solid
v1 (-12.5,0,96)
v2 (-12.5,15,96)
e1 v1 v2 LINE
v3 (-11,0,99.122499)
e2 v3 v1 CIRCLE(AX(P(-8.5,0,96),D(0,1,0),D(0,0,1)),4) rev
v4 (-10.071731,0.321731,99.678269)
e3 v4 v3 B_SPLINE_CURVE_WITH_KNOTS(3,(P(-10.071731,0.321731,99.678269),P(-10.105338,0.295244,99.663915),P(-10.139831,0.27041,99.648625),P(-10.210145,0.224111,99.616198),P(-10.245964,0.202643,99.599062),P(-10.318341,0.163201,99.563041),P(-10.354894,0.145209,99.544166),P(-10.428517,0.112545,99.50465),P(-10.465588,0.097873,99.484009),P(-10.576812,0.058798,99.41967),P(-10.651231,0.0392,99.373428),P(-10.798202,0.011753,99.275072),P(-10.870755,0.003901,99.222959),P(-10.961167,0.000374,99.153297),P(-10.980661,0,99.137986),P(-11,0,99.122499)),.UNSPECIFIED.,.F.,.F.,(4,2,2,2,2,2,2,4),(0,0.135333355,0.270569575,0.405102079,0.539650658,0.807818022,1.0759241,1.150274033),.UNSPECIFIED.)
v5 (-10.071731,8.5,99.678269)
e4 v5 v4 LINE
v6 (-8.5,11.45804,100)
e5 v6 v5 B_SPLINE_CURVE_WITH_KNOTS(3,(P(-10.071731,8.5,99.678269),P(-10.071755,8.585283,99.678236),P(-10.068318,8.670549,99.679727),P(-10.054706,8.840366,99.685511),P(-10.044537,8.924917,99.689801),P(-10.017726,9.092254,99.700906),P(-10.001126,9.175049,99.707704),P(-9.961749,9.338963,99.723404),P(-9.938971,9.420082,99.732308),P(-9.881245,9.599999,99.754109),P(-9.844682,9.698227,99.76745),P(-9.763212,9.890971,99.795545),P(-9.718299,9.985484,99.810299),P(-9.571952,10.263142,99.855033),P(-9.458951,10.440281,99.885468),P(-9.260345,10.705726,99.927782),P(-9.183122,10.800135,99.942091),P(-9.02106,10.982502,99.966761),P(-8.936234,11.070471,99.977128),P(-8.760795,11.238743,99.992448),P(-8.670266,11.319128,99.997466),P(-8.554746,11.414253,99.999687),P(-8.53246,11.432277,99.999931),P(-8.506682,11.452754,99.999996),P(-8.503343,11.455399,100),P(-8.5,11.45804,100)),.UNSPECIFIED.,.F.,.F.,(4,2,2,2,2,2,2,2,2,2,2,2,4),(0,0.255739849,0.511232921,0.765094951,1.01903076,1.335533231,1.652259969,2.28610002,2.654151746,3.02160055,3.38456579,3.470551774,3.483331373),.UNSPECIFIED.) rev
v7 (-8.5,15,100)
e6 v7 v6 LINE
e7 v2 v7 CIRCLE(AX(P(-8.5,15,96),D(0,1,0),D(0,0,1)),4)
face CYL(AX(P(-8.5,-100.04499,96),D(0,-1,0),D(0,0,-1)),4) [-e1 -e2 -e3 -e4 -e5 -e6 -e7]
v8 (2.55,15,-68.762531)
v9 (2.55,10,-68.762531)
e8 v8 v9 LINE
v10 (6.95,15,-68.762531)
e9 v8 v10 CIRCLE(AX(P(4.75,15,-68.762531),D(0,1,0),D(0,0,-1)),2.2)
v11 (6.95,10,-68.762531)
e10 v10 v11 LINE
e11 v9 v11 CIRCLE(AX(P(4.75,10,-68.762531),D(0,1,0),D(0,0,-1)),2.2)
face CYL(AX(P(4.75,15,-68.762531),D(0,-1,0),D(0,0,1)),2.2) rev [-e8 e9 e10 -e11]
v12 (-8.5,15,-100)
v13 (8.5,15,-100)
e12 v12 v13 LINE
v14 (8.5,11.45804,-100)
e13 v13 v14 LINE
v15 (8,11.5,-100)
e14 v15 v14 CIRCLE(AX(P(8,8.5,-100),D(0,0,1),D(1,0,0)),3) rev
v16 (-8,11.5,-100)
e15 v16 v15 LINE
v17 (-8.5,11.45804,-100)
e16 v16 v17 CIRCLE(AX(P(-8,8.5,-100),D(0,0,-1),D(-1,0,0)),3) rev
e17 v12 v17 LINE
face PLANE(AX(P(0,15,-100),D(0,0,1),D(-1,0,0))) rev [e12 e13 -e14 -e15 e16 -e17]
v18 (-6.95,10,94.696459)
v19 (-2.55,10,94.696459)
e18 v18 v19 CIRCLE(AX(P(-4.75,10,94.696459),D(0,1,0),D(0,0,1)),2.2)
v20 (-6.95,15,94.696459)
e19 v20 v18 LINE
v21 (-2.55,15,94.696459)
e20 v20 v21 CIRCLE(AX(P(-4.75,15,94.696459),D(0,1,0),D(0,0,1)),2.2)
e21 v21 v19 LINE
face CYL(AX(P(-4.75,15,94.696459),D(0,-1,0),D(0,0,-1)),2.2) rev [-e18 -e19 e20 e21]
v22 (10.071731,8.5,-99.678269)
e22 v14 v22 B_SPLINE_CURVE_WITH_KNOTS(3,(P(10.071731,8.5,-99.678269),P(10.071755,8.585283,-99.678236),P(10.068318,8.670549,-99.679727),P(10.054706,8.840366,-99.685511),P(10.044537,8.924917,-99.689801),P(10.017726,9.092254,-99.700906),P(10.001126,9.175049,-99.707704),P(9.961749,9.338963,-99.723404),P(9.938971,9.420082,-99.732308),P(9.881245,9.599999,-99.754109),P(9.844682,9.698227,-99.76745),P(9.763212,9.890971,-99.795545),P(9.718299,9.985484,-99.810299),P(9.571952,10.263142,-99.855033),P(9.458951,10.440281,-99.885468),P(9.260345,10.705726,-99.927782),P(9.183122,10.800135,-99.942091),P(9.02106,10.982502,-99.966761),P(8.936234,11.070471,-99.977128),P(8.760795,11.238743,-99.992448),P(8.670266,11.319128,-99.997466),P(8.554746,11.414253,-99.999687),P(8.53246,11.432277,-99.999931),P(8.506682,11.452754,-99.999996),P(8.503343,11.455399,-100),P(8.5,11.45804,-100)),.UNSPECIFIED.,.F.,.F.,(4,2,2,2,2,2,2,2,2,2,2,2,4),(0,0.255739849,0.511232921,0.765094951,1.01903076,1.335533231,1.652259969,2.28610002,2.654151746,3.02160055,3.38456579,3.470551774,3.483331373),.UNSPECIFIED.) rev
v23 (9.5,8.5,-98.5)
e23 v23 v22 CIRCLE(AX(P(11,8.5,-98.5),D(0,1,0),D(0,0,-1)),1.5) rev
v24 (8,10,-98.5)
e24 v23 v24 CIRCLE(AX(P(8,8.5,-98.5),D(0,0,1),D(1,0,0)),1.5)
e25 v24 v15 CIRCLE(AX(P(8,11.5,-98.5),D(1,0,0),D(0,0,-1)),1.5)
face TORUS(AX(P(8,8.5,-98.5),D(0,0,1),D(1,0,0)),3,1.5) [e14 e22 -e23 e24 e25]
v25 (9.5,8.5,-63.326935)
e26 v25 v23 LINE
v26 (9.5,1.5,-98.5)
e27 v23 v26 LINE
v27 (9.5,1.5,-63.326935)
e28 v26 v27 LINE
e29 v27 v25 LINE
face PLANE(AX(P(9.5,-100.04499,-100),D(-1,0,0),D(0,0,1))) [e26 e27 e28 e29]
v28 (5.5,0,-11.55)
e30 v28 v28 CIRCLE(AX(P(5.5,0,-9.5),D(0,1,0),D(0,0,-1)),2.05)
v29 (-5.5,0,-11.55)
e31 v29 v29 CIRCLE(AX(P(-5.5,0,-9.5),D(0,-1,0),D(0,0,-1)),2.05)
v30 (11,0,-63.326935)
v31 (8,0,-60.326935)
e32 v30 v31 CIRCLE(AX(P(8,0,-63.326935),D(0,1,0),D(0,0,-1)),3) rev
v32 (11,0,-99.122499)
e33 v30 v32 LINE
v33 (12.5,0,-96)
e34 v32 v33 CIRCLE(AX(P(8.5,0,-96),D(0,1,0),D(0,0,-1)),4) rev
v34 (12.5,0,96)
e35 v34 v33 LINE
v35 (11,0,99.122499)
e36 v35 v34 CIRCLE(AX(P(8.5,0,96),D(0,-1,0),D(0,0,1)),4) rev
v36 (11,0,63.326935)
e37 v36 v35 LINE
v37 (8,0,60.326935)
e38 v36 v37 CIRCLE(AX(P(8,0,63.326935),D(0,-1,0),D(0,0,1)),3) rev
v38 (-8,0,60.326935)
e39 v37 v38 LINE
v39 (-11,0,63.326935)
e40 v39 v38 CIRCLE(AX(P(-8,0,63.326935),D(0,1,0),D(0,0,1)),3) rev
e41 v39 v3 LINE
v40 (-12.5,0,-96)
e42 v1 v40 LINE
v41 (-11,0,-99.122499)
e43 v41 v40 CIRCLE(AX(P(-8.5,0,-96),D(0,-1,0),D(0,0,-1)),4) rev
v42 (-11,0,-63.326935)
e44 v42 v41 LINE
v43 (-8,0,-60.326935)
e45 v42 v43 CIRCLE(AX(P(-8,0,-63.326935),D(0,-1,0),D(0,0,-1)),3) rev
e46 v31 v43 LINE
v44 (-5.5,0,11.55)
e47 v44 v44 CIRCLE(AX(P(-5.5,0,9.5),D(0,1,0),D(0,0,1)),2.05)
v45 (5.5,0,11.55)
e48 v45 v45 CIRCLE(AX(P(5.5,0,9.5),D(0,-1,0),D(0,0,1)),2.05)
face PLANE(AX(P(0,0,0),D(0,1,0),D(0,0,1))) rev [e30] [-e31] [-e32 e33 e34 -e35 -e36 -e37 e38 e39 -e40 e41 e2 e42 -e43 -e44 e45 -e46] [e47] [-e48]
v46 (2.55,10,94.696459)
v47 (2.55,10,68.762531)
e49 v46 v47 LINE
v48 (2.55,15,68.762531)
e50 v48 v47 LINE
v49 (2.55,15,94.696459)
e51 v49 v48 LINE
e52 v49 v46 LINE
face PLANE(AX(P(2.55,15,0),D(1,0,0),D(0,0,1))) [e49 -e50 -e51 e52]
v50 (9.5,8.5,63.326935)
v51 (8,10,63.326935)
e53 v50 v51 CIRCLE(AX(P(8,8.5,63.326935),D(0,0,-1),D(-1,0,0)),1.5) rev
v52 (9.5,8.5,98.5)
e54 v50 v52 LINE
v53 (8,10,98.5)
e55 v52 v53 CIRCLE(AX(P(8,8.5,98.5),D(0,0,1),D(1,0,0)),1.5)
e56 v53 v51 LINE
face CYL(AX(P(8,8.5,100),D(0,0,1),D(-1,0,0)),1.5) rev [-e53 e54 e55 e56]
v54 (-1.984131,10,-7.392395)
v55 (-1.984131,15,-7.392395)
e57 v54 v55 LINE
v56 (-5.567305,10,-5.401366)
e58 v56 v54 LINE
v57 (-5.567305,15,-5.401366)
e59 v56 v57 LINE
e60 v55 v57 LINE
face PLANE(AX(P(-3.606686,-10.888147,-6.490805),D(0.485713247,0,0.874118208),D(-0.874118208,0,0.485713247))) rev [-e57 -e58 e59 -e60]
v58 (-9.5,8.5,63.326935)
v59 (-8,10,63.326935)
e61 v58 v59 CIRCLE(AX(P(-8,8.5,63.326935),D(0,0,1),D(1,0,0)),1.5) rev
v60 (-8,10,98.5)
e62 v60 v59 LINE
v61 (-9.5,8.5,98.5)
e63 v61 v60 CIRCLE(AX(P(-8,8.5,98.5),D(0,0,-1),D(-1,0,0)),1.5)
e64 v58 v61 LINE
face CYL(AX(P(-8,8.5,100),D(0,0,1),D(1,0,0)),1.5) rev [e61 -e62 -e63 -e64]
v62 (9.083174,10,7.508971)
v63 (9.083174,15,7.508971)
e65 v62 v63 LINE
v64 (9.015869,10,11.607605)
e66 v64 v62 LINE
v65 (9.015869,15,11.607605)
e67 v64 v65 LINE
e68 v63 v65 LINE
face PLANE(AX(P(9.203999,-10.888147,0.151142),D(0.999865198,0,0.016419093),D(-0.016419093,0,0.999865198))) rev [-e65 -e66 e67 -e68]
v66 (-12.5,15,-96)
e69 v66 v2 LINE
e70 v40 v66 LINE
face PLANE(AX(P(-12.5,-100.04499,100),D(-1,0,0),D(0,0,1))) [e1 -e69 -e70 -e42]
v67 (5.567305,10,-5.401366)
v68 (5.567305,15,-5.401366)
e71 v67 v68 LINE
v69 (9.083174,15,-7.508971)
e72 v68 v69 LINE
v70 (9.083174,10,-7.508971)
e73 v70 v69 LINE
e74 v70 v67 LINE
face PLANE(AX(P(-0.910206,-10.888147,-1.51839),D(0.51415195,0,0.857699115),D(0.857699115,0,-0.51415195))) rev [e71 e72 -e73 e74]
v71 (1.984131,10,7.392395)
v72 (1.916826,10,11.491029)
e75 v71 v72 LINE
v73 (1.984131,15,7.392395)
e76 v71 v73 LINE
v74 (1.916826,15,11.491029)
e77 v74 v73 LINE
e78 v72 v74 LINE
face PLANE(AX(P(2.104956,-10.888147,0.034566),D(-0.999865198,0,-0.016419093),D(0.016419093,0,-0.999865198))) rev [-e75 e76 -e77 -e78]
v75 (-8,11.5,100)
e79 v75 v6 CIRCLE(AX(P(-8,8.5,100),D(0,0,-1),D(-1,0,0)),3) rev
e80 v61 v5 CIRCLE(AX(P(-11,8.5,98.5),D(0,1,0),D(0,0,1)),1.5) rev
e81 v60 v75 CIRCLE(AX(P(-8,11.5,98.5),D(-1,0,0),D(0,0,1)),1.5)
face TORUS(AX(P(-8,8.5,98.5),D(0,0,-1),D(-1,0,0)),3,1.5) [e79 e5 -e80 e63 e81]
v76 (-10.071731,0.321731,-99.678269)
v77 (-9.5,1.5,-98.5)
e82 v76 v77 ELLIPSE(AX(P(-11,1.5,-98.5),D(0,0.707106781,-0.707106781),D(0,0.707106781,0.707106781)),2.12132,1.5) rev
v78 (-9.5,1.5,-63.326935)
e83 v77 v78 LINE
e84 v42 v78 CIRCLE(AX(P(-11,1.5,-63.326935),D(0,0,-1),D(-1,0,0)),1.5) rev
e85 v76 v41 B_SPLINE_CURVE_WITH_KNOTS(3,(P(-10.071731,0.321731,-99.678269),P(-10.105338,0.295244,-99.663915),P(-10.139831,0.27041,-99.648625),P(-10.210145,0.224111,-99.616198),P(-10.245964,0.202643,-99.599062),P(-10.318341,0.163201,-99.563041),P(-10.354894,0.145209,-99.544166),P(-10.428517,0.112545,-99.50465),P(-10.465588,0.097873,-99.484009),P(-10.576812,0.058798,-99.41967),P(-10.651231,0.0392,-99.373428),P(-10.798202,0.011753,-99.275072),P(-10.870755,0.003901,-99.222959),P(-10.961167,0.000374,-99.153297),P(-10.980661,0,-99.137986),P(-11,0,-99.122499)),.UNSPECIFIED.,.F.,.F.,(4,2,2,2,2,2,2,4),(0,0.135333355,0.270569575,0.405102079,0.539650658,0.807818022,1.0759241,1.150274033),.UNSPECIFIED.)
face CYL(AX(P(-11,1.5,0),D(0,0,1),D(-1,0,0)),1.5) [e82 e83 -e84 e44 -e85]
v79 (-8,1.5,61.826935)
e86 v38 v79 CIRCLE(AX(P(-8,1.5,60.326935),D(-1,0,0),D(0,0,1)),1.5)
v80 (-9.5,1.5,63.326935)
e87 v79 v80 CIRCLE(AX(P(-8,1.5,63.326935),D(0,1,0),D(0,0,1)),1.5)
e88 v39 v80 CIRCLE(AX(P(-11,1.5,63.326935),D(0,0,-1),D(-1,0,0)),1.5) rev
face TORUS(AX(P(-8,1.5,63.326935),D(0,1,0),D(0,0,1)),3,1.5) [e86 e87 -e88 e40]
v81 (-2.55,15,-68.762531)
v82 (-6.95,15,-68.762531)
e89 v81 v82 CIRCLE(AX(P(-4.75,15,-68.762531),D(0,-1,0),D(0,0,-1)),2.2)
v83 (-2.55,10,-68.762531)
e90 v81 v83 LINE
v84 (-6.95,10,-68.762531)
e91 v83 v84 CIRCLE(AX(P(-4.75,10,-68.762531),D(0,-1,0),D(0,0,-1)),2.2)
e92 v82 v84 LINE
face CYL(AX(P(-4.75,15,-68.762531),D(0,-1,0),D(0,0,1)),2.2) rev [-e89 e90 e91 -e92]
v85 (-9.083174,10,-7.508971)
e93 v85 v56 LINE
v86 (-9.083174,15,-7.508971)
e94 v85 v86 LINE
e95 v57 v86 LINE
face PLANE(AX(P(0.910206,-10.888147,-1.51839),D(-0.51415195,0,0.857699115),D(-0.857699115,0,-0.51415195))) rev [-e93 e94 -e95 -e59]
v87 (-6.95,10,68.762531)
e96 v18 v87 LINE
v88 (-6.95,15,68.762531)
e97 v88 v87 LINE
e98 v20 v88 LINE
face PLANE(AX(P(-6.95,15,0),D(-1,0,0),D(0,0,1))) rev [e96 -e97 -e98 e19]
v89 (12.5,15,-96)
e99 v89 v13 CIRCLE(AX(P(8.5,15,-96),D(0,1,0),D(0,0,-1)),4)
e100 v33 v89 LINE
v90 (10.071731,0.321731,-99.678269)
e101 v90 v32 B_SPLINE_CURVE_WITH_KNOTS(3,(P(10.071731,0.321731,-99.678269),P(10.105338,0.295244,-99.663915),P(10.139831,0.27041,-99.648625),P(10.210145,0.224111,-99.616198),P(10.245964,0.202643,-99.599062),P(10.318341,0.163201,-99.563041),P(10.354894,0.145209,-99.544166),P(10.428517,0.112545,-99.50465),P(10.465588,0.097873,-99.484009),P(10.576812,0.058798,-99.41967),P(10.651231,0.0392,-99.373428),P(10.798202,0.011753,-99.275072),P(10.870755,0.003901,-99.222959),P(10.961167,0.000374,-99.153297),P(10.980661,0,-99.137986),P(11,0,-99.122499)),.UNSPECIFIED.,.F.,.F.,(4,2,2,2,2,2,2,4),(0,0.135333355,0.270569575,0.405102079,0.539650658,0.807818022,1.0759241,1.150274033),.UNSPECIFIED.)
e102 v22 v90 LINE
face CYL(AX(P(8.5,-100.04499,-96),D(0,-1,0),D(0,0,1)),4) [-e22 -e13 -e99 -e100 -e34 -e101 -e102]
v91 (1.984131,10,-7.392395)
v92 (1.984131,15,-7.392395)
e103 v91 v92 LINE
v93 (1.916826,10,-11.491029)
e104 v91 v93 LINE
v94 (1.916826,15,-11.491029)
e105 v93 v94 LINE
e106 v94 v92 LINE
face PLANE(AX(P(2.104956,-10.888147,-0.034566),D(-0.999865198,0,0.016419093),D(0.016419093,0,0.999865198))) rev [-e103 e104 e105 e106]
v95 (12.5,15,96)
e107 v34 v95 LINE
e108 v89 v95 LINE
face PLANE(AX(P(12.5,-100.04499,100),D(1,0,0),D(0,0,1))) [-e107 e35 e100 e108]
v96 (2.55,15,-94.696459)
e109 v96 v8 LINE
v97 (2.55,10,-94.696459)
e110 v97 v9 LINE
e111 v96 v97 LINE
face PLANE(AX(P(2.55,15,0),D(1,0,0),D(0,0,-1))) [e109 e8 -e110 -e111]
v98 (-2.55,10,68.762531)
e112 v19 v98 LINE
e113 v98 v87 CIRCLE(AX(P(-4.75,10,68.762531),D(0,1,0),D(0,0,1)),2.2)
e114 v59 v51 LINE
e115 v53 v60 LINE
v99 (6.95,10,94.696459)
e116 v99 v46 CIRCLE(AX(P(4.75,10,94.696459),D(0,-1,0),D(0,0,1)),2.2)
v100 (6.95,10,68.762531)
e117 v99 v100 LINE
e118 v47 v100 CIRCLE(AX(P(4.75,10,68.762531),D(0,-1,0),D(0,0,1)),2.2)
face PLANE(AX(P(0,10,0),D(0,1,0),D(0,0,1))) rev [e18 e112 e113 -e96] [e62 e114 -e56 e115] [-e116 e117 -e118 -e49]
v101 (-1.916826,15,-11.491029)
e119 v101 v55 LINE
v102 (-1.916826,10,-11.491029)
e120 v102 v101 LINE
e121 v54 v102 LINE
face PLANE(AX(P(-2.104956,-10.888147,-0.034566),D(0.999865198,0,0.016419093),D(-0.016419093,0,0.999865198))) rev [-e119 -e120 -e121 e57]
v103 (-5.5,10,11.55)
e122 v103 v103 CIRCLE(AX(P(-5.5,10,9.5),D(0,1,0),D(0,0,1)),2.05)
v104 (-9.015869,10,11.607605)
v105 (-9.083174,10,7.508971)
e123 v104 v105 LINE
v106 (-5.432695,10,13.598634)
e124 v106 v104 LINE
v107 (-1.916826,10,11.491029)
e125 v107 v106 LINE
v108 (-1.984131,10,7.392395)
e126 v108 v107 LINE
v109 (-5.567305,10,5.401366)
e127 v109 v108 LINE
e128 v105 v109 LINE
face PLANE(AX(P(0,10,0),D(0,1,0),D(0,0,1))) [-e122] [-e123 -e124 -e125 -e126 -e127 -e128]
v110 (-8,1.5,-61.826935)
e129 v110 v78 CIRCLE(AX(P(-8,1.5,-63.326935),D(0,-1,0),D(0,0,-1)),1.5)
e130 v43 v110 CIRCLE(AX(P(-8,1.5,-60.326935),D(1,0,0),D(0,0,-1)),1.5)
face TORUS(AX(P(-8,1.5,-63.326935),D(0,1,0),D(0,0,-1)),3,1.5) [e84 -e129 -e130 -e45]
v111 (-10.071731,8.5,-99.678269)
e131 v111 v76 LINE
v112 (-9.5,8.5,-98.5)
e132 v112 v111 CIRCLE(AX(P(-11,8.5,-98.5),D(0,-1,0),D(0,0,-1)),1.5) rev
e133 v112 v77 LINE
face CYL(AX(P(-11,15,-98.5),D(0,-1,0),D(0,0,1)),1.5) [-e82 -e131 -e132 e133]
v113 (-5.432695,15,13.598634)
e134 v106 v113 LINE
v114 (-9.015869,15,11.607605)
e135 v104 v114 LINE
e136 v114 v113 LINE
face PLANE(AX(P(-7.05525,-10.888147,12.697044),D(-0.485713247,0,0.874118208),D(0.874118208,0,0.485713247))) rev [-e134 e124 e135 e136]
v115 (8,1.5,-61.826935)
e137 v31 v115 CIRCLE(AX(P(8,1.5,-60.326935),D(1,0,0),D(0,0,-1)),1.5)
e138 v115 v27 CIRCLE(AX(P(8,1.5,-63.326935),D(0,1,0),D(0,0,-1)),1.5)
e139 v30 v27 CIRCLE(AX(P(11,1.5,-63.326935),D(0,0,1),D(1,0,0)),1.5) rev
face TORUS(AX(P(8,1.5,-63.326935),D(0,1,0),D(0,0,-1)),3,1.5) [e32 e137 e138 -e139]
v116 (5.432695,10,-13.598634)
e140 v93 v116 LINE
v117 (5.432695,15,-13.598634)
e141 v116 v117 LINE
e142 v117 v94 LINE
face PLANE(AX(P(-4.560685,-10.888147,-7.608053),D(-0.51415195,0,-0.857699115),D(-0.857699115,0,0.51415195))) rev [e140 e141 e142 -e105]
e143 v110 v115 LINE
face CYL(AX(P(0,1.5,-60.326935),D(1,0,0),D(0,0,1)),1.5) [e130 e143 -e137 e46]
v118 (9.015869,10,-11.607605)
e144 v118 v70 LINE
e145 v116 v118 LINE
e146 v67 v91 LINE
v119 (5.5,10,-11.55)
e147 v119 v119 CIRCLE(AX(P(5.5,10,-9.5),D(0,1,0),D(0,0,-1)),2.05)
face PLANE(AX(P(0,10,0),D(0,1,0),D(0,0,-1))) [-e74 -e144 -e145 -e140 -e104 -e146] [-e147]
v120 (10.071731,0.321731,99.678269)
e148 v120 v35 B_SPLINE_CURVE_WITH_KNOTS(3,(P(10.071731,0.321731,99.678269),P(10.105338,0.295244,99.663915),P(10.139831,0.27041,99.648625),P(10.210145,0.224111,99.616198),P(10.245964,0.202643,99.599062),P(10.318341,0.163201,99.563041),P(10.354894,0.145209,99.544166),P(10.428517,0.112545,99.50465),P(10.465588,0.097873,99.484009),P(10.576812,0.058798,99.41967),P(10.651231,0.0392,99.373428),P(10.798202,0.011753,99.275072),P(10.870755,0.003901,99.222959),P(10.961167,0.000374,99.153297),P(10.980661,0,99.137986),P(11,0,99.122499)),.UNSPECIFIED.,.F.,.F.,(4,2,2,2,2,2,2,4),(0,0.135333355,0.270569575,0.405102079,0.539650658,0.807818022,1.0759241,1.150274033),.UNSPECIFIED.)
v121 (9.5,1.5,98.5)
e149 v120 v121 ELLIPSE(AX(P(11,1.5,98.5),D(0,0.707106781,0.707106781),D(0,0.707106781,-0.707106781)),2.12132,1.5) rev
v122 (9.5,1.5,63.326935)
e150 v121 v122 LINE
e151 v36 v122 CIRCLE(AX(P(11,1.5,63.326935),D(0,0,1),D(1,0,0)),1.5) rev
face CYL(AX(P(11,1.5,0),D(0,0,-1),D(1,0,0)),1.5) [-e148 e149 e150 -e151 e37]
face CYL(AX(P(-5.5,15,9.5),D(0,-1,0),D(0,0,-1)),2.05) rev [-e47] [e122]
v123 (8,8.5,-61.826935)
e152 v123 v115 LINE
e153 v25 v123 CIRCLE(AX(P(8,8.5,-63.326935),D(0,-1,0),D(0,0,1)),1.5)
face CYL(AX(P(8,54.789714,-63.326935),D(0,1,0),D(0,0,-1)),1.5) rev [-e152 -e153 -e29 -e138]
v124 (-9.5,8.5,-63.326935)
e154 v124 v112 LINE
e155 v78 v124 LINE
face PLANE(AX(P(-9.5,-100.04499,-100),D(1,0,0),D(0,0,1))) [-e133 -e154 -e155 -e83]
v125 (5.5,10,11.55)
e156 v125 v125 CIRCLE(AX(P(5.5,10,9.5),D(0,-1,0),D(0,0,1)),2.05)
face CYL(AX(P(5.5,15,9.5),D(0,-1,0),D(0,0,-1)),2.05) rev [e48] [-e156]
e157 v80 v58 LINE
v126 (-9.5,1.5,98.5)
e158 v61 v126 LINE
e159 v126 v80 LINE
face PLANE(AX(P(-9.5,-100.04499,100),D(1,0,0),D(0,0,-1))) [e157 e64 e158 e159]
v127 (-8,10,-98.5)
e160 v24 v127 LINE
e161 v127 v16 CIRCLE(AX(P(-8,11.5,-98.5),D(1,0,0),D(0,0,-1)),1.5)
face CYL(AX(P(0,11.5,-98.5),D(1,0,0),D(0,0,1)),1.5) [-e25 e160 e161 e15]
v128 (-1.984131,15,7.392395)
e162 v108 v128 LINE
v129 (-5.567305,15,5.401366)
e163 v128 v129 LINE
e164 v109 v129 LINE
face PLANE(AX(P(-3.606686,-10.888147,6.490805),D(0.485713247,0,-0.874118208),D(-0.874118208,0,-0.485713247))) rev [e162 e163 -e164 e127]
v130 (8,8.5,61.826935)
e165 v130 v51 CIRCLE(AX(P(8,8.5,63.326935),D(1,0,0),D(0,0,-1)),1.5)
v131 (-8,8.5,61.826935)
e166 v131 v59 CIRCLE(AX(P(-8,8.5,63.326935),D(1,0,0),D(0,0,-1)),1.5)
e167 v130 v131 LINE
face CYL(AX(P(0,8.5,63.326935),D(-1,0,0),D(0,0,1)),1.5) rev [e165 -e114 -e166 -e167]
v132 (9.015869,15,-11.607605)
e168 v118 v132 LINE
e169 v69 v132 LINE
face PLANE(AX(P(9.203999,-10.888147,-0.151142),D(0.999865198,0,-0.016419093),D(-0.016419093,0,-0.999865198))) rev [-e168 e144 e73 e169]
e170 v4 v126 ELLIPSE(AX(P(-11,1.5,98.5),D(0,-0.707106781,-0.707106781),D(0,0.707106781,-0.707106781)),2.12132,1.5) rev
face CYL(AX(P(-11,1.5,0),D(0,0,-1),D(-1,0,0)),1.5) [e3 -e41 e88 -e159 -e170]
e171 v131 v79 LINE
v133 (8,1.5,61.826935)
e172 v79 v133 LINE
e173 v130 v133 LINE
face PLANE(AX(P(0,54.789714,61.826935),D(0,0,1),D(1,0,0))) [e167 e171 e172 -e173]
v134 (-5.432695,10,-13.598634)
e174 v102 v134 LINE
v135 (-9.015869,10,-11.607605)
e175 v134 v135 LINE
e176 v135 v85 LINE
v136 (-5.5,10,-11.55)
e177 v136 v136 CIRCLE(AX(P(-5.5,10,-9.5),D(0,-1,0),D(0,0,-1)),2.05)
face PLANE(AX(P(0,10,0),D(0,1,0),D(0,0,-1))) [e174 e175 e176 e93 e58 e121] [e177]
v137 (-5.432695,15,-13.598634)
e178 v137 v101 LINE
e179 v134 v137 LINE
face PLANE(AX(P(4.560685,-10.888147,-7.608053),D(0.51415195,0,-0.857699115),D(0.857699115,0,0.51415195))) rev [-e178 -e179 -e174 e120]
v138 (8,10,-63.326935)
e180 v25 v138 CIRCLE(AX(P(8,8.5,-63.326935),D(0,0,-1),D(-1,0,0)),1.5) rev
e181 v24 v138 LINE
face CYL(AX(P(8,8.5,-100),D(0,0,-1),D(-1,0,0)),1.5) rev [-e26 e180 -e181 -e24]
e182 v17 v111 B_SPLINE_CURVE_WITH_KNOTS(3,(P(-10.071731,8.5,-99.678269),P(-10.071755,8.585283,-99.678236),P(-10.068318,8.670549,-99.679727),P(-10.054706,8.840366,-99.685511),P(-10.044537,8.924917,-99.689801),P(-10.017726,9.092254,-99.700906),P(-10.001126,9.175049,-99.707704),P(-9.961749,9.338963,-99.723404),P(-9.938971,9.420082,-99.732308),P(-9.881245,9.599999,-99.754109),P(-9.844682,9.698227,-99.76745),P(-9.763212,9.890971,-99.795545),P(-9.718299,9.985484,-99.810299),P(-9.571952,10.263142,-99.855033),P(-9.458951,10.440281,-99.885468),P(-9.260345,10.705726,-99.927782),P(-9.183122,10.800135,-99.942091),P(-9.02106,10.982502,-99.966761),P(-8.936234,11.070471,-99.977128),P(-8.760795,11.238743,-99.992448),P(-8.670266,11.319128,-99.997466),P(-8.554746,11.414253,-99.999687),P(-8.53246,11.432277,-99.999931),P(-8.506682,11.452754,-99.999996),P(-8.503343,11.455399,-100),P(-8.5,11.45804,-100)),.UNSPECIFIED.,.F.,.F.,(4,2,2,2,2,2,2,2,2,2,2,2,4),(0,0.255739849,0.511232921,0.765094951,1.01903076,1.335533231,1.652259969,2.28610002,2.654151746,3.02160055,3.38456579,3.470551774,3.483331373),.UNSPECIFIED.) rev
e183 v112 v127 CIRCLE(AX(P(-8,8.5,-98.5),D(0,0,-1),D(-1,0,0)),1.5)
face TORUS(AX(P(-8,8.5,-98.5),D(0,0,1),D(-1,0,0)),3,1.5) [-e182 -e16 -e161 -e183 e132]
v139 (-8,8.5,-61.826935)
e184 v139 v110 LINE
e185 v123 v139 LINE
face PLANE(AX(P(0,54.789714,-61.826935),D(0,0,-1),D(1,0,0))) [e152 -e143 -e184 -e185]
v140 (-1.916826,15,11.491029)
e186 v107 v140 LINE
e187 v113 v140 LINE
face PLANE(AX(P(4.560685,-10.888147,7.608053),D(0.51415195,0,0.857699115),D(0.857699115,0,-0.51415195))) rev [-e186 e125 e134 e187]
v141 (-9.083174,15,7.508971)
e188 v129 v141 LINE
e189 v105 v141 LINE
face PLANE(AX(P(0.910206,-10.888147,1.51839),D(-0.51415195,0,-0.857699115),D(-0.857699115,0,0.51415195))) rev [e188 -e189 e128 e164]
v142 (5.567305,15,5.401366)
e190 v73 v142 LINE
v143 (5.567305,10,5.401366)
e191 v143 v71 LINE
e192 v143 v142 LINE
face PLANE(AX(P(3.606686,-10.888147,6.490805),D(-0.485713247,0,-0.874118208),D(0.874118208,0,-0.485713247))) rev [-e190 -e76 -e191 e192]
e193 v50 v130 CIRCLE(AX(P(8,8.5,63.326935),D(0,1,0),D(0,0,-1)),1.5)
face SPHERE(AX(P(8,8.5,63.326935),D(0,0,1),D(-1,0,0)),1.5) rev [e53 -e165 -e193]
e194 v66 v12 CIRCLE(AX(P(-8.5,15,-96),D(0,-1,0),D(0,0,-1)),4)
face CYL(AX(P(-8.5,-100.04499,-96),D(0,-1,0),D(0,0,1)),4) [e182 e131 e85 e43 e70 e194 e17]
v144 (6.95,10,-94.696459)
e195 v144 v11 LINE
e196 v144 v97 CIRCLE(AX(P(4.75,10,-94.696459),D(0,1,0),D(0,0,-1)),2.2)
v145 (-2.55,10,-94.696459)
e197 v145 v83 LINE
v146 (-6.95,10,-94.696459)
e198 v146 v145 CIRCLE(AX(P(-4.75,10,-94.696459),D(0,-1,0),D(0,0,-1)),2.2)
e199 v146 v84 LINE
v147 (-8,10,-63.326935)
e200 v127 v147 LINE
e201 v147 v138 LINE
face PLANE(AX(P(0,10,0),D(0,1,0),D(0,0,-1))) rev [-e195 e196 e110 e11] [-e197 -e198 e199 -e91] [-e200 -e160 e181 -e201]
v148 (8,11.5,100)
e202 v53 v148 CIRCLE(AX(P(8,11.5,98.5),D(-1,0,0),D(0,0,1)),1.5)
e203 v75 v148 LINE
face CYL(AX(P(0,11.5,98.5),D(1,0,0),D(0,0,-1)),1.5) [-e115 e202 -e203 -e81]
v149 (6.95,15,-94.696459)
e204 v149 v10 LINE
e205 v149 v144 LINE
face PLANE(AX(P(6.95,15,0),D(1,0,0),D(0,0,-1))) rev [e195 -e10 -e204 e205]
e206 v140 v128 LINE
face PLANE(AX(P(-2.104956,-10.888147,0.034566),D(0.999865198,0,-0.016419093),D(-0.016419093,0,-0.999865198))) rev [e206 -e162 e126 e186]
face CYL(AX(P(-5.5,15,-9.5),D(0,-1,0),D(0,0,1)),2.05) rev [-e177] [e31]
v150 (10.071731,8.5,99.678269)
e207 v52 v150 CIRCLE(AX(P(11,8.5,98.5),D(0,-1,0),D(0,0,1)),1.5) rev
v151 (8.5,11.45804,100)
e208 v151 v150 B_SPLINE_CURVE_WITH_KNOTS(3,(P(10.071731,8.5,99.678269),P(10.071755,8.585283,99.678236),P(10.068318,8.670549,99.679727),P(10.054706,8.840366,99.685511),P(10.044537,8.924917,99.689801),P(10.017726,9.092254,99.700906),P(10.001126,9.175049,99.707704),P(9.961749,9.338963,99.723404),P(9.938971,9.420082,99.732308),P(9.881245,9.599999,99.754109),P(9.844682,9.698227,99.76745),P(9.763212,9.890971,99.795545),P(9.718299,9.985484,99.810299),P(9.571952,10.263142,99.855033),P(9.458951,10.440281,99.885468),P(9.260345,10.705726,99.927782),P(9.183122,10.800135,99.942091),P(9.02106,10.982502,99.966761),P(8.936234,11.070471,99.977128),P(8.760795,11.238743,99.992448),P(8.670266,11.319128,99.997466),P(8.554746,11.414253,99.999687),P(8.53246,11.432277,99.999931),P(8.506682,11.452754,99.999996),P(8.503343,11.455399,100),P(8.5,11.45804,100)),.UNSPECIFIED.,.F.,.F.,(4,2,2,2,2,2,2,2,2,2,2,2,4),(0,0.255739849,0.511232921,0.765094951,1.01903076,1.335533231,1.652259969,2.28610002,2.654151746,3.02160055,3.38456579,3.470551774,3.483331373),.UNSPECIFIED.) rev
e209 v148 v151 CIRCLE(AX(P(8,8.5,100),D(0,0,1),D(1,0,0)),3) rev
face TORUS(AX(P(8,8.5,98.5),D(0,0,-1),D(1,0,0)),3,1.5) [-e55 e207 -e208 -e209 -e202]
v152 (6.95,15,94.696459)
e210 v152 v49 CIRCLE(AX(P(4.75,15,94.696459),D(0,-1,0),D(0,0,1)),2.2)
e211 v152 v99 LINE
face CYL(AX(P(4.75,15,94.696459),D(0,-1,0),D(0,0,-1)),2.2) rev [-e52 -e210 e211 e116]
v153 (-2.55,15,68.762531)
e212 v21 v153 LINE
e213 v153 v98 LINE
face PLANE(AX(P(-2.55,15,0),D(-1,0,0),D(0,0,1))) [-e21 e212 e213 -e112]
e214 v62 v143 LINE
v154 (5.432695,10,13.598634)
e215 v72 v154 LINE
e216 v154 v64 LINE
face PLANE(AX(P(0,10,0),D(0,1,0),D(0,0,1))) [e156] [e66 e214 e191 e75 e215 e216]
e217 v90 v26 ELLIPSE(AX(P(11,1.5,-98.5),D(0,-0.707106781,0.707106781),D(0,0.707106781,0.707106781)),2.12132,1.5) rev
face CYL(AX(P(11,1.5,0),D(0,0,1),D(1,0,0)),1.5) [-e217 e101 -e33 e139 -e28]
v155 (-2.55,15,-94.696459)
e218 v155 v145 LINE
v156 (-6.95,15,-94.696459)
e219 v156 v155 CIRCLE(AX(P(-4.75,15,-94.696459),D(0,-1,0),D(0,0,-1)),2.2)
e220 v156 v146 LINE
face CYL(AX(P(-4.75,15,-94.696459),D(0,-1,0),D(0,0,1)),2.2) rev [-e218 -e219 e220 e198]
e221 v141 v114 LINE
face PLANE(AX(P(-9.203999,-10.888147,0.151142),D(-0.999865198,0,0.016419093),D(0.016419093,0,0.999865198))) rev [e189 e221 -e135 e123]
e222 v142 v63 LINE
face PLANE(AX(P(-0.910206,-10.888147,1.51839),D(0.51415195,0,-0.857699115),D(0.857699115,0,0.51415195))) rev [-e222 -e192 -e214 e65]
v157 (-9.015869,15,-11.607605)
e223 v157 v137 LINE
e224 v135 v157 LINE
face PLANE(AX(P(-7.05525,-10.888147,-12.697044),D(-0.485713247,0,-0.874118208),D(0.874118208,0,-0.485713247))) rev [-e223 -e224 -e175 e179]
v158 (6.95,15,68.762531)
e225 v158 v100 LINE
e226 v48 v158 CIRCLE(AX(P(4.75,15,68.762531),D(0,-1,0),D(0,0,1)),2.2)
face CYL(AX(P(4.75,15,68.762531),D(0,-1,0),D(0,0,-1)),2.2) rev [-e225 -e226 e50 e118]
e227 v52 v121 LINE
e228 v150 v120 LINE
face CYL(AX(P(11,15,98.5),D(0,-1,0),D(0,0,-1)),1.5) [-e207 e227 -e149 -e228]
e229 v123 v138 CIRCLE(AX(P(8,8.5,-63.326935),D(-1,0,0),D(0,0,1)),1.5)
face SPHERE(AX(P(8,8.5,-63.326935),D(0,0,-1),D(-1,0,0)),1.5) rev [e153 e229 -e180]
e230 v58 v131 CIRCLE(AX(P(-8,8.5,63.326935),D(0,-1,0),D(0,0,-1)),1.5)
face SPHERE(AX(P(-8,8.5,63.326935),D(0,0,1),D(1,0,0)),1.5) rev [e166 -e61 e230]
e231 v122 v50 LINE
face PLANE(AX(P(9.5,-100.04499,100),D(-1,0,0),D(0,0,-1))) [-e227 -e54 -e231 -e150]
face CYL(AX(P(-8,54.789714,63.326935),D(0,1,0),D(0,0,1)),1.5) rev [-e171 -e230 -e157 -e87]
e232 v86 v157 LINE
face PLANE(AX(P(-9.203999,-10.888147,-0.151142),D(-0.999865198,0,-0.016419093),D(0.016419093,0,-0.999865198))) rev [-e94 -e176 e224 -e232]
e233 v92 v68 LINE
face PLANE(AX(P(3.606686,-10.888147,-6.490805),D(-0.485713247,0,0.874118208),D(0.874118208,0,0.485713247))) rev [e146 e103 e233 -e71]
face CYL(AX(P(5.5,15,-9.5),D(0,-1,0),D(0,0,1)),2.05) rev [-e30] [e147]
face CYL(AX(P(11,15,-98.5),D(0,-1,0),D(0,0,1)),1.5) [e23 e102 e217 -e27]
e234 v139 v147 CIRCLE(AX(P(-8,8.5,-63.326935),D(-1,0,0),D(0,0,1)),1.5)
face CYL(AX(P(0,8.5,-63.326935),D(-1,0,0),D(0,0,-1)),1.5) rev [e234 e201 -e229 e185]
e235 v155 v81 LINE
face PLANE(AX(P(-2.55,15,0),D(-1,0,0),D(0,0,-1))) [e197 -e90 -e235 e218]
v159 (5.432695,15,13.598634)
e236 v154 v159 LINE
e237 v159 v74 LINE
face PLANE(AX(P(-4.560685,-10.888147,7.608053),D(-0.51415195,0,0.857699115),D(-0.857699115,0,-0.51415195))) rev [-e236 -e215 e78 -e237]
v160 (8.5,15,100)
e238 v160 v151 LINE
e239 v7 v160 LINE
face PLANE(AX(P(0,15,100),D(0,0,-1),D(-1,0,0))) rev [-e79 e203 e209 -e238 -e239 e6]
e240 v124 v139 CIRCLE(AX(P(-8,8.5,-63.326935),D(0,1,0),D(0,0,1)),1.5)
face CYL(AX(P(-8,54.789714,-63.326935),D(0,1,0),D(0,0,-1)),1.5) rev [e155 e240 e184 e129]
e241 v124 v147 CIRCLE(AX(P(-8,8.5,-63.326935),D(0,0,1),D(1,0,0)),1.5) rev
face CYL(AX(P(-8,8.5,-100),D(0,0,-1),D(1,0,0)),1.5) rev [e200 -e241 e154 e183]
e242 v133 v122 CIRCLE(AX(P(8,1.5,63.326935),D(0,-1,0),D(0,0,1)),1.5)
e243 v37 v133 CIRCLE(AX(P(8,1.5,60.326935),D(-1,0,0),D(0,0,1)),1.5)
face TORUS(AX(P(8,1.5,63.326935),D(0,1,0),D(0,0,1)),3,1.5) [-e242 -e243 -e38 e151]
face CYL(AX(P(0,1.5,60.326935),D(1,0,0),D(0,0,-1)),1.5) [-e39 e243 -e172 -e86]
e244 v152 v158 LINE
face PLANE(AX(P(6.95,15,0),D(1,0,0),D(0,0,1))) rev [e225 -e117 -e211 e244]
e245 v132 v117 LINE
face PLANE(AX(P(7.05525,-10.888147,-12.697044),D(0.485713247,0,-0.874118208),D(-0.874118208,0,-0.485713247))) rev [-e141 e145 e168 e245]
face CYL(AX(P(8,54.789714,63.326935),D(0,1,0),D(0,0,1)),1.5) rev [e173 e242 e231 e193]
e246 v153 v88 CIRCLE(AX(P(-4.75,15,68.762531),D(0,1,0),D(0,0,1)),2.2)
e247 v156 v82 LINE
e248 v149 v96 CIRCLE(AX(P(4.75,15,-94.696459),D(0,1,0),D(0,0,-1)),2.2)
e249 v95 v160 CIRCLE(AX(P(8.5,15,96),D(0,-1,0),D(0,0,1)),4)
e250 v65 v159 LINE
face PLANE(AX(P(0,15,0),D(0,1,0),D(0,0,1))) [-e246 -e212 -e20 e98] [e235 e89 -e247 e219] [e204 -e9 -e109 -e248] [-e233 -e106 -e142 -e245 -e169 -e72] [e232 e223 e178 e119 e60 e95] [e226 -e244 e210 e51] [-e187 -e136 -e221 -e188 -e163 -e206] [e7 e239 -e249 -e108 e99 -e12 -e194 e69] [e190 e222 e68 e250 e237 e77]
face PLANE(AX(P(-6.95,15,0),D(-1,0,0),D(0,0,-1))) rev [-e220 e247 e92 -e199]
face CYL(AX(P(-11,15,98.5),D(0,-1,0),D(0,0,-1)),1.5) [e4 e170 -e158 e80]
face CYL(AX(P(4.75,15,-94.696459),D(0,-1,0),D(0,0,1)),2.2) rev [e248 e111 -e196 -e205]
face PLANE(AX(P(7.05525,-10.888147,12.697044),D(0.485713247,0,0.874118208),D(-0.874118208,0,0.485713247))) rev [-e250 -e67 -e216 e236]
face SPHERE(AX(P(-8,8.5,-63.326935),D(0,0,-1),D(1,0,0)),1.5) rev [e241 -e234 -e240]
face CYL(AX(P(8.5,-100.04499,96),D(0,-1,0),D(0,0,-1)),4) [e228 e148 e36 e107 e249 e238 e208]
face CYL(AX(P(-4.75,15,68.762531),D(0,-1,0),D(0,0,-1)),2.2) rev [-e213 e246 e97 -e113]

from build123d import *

# Parameters (mm, degrees)
SKETCH1_W           = 9.5
SKETCH1_H           = 100
SKETCH1_R           = 2.05
BOSS_EXTRUDE1_DEPTH = 15
CUT_EXTRUDE1_START  = -5
SKETCH2_R           = 2.05
CUT_EXTRUDE1_DEPTH  = 5
SKETCH3_W           = 11.226687125
SKETCH3_H           = 38.173064709
CUT_EXTRUDE2_DEPTH  = 10
SKETCH6_W           = 3
SKETCH6_H           = 100
BOSS_EXTRUDE2_DEPTH = 15
FILLET1_R           = 1.5
FILLET2_START       = -1
FILLET2_DEPTH       = 17


with BuildPart() as part:
    # Sketch1 → Boss-Extrude1 (new body)
    with BuildSketch(Plane(origin=(0, 0, 0), x_dir=(1, 0, 0), z_dir=(0, 1, 0))):
        with Locations((-4.75, -50)):
            Rectangle(SKETCH1_W, SKETCH1_H)
        with BuildLine():
            ThreePointArc((-2.55, -94.696458633), (-4.75, -96.896458633), (-6.95, -94.696458633))
            Line((-6.95, -94.696458633), (-6.95, -68.762531393))
            ThreePointArc((-6.95, -68.762531393), (-4.75, -66.562531393), (-2.55, -68.762531393))
            Line((-2.55, -68.762531393), (-2.55, -94.696458633))
        make_face(mode=Mode.SUBTRACT)
        with Locations(Location((-5.5, -9.5, 0), (0, 0, 270))):
            Circle(SKETCH1_R, mode=Mode.SUBTRACT)
    extrude(amount=BOSS_EXTRUDE1_DEPTH)

    # Sketch2 → Cut-Extrude1 (cut)
    with BuildSketch(Plane(origin=(0, 15, 0), x_dir=(1, 0, 0), z_dir=(0, 1, 0)).offset(CUT_EXTRUDE1_START)):
        Polygon((-9.015868986, -11.607604946), (-5.432695069, -13.598634331), (-1.916826083, -11.491029385), (-1.984131014, -7.392395054), (-5.567304931, -5.401365669), (-9.083173917, -7.508970615), align=None)
        with Locations(Location((-5.5, -9.5, 0), (0, 0, 270))):
            Circle(SKETCH2_R, mode=Mode.SUBTRACT)
    extrude(amount=CUT_EXTRUDE1_DEPTH, mode=Mode.SUBTRACT)

    # Sketch3 → Cut-Extrude2 (cut)
    with BuildSketch(Plane(origin=(0, 0, 0), x_dir=(1, 0, 0), z_dir=(0, 1, 0))):
        with Locations((-5.613343563, -80.913467646)):
            Rectangle(SKETCH3_W, SKETCH3_H)
    extrude(amount=CUT_EXTRUDE2_DEPTH, mode=Mode.SUBTRACT)

    # Sketch6 → Boss-Extrude2 (add)
    with BuildSketch(Plane(origin=(0, 15, 0), x_dir=(1, 0, 0), z_dir=(0, 1, 0))):
        with Locations((-11, -50)):
            Rectangle(SKETCH6_W, SKETCH6_H)
    extrude(amount=-BOSS_EXTRUDE2_DEPTH)

    # Fillet1
    fillet1_edges = [part.edges().sort_by_distance(p)[0] for p in [
        (-4.75, 10, 61.826935291),
        (-9.5, 10, 80.913467645),
        (-4.75, 10, 100),
        (-4.75, 0, 61.826935291),
        (-9.5, 5, 61.826935291),
        (-9.5, 5, 100),
        (-9.5, 0, 80.913467645),
    ]]
    fillet(fillet1_edges, radius=FILLET1_R)

    # Fillet2: read off the stored shape, not the designer's step
    # Fillet2 outline → Fillet2 (cut)
    with BuildSketch(Plane(origin=(0, 0, 0), x_dir=(1, 0, 0), z_dir=(0, 1, 0)).offset(FILLET2_START)):
        with BuildLine():
            ThreePointArc((-8.5, -100), (-11.328427125, -98.828427125), (-12.5, -96))
            Line((-12.5, -96), (-12.5, -100))
            Line((-12.5, -100), (-8.5, -100))
        make_face()
    extrude(amount=FILLET2_DEPTH, mode=Mode.SUBTRACT)

    # Mirror1: part across plane


with BuildPart() as part_1:
    add(part.part)
    add(part.part.mirror(Plane(origin=(0, 15, 0), x_dir=(0, 0, 1), z_dir=(1, 0, 0))))

    # Mirror2: part across face


with BuildPart() as part_2:
    add(part_1.part)
    add(part_1.part.mirror(Plane(origin=(0, 7.5, 0), x_dir=(1, 0, 0), z_dir=(0, 0, -1))))


solid = part_2.part
